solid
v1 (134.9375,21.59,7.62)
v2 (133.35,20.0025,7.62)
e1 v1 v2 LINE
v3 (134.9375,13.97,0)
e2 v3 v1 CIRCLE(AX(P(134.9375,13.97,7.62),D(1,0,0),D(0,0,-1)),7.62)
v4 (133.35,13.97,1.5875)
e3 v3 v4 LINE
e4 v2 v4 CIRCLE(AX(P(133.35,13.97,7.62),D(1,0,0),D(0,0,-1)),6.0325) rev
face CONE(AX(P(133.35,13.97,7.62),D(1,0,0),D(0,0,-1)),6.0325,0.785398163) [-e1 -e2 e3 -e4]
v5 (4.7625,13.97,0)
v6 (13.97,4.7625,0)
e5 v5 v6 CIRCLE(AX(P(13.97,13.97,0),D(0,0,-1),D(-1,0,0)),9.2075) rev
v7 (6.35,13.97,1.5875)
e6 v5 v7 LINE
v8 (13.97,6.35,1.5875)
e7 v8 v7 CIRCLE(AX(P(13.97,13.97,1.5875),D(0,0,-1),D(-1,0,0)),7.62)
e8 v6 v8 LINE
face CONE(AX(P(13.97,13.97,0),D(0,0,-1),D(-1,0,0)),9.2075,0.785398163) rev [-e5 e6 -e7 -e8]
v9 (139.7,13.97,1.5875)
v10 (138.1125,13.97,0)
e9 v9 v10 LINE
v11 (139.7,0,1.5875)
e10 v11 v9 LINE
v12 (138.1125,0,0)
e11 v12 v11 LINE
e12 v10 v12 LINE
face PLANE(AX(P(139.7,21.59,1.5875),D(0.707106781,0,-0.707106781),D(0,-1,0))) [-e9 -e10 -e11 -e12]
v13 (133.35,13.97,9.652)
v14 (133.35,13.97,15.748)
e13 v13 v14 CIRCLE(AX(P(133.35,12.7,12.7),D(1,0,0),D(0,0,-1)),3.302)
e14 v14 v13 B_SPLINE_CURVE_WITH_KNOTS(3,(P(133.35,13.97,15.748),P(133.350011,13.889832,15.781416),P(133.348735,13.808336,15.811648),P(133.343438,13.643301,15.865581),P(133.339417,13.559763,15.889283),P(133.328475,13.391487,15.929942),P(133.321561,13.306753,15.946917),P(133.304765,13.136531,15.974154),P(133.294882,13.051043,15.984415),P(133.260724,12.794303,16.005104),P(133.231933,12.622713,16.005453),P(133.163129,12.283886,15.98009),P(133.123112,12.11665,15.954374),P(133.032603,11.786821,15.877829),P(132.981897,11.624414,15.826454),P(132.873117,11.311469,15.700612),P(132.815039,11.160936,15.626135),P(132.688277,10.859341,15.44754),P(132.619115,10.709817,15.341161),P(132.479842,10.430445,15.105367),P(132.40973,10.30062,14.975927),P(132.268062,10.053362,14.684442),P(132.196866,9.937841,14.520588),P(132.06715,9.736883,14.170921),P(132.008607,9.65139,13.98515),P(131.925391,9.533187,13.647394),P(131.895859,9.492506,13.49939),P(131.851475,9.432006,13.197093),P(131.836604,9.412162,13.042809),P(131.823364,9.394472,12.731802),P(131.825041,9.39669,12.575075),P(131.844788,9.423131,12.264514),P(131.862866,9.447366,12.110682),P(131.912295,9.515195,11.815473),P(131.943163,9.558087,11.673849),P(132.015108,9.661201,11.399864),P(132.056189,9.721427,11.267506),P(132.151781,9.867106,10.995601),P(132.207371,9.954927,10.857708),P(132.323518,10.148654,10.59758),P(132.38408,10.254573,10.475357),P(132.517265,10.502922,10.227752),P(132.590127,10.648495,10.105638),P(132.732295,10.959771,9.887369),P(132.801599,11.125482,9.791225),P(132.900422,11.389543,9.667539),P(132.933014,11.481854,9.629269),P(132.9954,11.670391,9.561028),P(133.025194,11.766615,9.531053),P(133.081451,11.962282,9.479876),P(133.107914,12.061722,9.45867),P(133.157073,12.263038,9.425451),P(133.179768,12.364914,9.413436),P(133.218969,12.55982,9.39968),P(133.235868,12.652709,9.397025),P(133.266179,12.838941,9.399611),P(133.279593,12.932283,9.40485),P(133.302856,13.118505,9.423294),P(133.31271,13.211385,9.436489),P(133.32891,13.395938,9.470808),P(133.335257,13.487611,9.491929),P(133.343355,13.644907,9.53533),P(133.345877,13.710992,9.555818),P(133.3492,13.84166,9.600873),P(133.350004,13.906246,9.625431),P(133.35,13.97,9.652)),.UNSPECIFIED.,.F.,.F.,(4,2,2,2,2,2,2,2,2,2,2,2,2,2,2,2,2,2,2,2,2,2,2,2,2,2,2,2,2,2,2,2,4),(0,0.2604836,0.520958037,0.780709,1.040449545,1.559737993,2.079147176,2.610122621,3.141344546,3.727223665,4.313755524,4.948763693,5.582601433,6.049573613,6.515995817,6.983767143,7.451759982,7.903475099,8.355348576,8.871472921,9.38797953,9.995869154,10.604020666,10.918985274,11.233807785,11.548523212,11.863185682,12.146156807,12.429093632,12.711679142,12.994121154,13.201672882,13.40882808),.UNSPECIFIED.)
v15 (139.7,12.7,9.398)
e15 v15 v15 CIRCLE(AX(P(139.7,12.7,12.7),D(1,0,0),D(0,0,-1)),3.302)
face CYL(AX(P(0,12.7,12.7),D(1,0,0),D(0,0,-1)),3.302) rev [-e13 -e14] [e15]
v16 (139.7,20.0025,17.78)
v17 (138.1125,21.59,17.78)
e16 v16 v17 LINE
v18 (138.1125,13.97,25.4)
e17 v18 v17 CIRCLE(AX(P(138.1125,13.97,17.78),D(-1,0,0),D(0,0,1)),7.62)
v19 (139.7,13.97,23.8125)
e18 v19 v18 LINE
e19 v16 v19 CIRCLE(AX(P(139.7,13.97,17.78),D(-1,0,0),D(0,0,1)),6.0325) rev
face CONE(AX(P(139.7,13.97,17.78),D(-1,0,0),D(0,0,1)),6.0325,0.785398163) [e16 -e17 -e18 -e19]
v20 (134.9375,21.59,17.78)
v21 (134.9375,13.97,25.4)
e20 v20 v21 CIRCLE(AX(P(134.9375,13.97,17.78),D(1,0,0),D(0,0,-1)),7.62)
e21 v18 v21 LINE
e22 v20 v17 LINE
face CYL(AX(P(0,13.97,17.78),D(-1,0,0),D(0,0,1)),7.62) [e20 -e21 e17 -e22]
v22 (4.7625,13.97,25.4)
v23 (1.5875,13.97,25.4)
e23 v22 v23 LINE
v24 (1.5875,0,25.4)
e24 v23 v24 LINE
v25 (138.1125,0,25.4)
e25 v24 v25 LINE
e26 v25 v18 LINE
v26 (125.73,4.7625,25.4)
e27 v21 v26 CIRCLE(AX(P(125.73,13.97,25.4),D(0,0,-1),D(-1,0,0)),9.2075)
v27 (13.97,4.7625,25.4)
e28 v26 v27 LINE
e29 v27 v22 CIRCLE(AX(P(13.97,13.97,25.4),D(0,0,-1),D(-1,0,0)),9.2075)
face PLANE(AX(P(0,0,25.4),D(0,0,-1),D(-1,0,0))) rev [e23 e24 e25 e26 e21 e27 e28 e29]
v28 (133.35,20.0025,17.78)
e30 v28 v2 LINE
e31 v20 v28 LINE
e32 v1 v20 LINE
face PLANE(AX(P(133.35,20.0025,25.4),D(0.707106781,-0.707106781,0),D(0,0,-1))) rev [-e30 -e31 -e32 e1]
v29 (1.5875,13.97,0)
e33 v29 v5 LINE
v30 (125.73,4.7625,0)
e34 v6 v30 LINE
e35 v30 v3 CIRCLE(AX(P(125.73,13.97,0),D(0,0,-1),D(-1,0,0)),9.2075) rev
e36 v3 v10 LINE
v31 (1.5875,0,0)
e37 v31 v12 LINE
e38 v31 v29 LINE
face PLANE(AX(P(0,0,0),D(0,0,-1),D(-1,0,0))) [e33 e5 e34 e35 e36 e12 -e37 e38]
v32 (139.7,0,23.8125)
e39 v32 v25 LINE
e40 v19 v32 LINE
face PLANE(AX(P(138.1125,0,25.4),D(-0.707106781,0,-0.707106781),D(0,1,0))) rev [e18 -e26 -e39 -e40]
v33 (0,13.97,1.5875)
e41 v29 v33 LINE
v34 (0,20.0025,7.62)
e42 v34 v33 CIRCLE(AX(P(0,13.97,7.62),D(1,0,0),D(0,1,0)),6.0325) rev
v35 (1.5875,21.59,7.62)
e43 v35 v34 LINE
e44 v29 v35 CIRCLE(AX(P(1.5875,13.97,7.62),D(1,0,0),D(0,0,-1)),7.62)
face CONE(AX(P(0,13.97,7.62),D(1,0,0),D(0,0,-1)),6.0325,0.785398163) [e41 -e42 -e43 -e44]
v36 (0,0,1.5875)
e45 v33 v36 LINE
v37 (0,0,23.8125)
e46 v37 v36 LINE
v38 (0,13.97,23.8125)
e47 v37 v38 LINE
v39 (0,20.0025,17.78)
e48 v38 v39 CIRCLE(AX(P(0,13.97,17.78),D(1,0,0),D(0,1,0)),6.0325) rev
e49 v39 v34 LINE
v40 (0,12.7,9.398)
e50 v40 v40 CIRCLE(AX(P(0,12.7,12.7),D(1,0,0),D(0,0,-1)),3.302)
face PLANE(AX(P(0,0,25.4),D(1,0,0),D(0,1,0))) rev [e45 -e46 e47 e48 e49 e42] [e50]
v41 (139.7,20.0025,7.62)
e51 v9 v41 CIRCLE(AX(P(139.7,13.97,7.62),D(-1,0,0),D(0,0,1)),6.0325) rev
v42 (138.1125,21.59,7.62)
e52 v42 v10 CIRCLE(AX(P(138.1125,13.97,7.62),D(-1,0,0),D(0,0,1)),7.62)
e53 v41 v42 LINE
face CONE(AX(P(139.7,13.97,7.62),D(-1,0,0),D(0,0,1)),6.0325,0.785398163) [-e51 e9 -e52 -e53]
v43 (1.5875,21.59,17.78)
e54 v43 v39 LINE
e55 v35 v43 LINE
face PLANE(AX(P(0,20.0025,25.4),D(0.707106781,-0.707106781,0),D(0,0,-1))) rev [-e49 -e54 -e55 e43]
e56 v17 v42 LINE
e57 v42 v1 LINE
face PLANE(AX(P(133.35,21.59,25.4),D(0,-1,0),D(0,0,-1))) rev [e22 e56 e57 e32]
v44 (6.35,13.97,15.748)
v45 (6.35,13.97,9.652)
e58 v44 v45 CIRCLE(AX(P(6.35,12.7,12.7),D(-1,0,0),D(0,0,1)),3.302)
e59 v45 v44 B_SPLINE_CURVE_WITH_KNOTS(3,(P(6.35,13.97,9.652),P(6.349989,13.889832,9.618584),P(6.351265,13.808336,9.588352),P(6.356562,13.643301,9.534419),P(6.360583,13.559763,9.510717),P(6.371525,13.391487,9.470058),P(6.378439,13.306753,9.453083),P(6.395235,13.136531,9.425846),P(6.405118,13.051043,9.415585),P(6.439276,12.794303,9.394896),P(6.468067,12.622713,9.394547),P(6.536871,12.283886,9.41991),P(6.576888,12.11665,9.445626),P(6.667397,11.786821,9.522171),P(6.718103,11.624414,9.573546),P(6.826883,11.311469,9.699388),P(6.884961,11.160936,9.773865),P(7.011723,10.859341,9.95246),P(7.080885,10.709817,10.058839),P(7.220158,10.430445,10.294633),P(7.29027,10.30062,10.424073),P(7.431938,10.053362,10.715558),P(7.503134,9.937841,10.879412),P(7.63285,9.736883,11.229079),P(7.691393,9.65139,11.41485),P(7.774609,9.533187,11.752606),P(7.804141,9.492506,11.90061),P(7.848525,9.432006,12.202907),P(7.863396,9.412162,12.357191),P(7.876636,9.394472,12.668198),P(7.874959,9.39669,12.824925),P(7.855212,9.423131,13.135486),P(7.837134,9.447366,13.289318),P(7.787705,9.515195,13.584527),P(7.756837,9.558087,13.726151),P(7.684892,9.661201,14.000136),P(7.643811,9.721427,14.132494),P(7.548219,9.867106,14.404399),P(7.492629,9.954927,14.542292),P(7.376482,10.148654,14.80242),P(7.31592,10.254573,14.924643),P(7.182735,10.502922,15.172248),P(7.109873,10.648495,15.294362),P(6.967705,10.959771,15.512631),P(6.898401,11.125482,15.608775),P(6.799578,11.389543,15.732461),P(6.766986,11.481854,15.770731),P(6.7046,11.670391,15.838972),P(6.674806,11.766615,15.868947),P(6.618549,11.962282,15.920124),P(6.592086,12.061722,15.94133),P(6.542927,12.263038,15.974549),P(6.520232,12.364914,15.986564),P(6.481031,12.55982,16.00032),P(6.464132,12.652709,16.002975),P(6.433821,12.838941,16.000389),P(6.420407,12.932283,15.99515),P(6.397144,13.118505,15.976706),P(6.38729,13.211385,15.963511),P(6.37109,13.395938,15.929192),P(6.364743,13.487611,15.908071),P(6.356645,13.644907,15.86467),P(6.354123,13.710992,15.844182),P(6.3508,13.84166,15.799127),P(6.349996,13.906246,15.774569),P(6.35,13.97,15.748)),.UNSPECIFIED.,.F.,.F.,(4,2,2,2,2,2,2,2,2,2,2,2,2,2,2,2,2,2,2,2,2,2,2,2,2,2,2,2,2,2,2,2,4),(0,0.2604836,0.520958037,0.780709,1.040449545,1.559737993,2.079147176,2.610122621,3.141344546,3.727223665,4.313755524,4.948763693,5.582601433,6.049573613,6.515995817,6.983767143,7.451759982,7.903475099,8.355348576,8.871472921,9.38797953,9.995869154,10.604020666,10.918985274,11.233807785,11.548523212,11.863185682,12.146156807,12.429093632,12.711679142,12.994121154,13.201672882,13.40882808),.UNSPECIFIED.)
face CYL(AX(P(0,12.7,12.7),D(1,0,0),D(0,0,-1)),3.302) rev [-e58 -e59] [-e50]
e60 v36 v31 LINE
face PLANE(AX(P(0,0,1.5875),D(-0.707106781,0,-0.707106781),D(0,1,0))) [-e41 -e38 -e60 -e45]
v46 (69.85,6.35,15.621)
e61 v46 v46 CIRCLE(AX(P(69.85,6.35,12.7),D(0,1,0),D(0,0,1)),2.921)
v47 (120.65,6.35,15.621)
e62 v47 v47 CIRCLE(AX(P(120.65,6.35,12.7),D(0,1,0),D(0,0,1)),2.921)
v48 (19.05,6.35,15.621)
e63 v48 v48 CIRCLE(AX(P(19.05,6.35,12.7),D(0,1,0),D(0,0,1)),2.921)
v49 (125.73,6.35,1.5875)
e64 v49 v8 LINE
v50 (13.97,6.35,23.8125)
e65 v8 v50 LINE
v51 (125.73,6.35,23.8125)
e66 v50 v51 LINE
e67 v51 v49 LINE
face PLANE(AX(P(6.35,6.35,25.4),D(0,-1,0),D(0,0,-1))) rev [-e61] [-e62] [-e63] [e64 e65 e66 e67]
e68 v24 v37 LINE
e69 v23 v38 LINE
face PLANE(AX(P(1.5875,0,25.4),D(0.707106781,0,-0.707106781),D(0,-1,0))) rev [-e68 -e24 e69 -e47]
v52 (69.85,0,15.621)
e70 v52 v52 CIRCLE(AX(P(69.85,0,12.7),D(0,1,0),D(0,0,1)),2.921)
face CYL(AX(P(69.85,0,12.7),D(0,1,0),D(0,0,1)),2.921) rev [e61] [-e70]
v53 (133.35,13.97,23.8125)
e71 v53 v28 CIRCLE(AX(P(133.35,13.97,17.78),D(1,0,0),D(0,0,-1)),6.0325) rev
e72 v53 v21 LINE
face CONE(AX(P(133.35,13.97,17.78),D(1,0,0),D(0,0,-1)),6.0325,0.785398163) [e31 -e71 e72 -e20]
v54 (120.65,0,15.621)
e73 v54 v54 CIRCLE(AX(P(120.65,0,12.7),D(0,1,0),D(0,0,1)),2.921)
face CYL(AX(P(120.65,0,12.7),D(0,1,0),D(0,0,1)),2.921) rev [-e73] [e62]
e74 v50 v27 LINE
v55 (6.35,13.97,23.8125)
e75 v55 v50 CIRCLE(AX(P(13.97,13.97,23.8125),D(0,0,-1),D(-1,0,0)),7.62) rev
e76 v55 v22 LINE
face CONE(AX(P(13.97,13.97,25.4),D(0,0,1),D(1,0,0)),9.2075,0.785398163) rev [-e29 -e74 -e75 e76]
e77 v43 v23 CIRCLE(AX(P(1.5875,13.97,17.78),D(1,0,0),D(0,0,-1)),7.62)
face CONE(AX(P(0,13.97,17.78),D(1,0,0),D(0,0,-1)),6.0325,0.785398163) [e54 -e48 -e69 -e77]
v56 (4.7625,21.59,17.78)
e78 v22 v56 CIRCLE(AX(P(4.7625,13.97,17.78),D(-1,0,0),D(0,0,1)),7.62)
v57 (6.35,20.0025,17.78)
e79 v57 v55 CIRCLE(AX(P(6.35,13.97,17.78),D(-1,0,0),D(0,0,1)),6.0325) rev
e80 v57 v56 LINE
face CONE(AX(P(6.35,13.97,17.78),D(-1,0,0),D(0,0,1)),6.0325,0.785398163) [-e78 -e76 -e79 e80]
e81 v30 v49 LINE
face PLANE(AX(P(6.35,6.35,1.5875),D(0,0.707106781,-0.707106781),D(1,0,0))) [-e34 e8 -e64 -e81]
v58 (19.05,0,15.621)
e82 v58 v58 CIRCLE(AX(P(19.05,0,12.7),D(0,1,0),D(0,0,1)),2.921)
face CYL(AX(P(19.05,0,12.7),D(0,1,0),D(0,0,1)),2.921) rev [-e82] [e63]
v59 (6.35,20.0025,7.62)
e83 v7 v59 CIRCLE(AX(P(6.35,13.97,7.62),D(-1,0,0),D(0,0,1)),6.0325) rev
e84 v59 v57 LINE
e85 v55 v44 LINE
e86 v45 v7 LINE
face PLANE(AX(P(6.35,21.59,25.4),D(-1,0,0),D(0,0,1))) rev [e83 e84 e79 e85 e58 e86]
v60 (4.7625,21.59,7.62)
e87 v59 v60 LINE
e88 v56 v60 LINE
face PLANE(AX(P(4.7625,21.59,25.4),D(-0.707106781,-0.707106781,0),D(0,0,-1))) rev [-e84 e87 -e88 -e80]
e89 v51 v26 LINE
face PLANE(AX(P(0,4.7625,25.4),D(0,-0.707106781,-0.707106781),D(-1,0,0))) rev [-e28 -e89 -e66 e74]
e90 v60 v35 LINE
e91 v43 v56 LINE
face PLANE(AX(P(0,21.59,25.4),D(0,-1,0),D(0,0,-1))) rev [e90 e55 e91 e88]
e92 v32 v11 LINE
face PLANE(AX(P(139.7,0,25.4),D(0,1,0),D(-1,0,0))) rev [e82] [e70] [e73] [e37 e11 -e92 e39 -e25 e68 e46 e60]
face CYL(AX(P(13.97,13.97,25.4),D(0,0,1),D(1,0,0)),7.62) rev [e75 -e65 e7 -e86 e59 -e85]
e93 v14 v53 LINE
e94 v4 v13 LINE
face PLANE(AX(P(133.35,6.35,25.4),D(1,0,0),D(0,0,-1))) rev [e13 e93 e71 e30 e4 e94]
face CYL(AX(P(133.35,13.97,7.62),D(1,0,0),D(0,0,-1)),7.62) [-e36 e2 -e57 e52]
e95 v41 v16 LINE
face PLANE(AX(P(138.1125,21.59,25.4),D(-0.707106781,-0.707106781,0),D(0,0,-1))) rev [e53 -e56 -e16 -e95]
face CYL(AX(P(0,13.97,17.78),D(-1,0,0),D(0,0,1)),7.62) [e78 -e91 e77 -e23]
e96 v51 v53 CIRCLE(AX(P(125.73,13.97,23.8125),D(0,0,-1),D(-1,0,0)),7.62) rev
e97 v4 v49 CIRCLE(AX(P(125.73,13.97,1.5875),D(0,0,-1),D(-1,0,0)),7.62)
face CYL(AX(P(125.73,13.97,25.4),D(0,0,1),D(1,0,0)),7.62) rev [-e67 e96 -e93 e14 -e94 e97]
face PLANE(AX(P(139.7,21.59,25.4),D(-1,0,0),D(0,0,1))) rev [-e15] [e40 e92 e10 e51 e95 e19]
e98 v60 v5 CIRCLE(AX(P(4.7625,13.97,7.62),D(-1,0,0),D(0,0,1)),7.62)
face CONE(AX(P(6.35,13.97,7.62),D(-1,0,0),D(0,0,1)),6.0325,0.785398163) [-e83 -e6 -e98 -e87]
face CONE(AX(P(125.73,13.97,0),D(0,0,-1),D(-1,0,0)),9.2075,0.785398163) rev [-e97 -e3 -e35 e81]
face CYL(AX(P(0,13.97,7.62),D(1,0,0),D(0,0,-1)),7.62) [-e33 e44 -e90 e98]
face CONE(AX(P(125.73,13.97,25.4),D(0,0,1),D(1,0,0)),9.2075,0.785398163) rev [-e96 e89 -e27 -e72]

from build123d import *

# Parameters (mm, degrees)
BOSS_EXTRUDE1_DEPTH = 25.4
FILLET1_R           = 7.62
SKETCH2_R           = 2.921
CUT_EXTRUDE1_DEPTH  = 143.805838816
CHAMFER1_SIZE       = 1.5875
SKETCH3_R           = 3.302
CUT_EXTRUDE2_DEPTH  = 144.622345406


with BuildPart() as part:
    # Sketch1 → Boss-Extrude1 (new body)
    with BuildSketch(Plane.XY):
        Polygon((0, 0), (0, 21.59), (6.35, 21.59), (6.35, 6.35), (133.35, 6.35), (133.35, 21.59), (139.7, 21.59), (139.7, 0), align=None)
    extrude(amount=BOSS_EXTRUDE1_DEPTH)

    # Fillet1
    fillet1_edges = [part.edges().sort_by_distance(p)[0] for p in [
        (136.525, 21.59, 0),
        (136.525, 21.59, 25.4),
        (3.175, 21.59, 0),
        (3.175, 21.59, 25.4),
        (133.35, 6.35, 12.7),
        (6.35, 6.35, 12.7),
    ]]
    fillet(fillet1_edges, radius=FILLET1_R - 0.0001)  # a hair under: the kernel refuses the full size

    # Sketch2 → Cut-Extrude1 (cut, through all)
    with BuildSketch(Plane(origin=(0, 6.35, 0), x_dir=(1, 0, 0), z_dir=(0, 1, 0))):
        with Locations(Location((69.85, -12.7, 0), (0, 0, 270))):
            Circle(SKETCH2_R)
        with Locations(Location((120.65, -12.7, 0), (0, 0, 270))):
            Circle(SKETCH2_R)
        with Locations(Location((19.05, -12.7, 0), (0, 0, 270))):
            Circle(SKETCH2_R)
    extrude(amount=-CUT_EXTRUDE1_DEPTH, mode=Mode.SUBTRACT)

    # Chamfer1
    chamfer1_edges = [part.edges().sort_by_distance(p)[0] for p in [
        (139.7, 6.98505, 0),
        (133.35, 21.59, 12.7),
        (139.7, 21.59, 12.7),
        (133.35, 19.358182962, 23.168182962),
        (133.35, 19.358182962, 2.231817038),
        (0, 6.98505, 0),
        (69.85, 6.35, 0),
        (139.7, 19.358182962, 23.168182962),
        (139.7, 19.358182962, 2.231817038),
        (69.85, 6.35, 25.4),
        (0, 6.98505, 25.4),
        (0, 21.59, 12.7),
        (6.35, 21.59, 12.7),
        (0, 19.358182962, 23.168182962),
        (0, 19.358182962, 2.231817038),
        (6.35, 19.358182962, 23.168182962),
        (6.35, 19.358182962, 2.231817038),
        (131.118182962, 8.581817038, 0),
        (131.118182962, 8.581817038, 25.4),
        (8.581817038, 8.581817038, 0),
        (8.581817038, 8.581817038, 25.4),
        (139.7, 6.98505, 25.4),
    ]]
    chamfer(chamfer1_edges, length=CHAMFER1_SIZE)

    # Sketch3 → Cut-Extrude2 (cut, through all)
    with BuildSketch(Plane(origin=(139.7, 0, 0), x_dir=(0, 0, -1), z_dir=(1, 0, 0))):
        with Locations((-12.7, 12.7)):
            Circle(SKETCH3_R)
    extrude(amount=-CUT_EXTRUDE2_DEPTH, mode=Mode.SUBTRACT)


solid = part.part
